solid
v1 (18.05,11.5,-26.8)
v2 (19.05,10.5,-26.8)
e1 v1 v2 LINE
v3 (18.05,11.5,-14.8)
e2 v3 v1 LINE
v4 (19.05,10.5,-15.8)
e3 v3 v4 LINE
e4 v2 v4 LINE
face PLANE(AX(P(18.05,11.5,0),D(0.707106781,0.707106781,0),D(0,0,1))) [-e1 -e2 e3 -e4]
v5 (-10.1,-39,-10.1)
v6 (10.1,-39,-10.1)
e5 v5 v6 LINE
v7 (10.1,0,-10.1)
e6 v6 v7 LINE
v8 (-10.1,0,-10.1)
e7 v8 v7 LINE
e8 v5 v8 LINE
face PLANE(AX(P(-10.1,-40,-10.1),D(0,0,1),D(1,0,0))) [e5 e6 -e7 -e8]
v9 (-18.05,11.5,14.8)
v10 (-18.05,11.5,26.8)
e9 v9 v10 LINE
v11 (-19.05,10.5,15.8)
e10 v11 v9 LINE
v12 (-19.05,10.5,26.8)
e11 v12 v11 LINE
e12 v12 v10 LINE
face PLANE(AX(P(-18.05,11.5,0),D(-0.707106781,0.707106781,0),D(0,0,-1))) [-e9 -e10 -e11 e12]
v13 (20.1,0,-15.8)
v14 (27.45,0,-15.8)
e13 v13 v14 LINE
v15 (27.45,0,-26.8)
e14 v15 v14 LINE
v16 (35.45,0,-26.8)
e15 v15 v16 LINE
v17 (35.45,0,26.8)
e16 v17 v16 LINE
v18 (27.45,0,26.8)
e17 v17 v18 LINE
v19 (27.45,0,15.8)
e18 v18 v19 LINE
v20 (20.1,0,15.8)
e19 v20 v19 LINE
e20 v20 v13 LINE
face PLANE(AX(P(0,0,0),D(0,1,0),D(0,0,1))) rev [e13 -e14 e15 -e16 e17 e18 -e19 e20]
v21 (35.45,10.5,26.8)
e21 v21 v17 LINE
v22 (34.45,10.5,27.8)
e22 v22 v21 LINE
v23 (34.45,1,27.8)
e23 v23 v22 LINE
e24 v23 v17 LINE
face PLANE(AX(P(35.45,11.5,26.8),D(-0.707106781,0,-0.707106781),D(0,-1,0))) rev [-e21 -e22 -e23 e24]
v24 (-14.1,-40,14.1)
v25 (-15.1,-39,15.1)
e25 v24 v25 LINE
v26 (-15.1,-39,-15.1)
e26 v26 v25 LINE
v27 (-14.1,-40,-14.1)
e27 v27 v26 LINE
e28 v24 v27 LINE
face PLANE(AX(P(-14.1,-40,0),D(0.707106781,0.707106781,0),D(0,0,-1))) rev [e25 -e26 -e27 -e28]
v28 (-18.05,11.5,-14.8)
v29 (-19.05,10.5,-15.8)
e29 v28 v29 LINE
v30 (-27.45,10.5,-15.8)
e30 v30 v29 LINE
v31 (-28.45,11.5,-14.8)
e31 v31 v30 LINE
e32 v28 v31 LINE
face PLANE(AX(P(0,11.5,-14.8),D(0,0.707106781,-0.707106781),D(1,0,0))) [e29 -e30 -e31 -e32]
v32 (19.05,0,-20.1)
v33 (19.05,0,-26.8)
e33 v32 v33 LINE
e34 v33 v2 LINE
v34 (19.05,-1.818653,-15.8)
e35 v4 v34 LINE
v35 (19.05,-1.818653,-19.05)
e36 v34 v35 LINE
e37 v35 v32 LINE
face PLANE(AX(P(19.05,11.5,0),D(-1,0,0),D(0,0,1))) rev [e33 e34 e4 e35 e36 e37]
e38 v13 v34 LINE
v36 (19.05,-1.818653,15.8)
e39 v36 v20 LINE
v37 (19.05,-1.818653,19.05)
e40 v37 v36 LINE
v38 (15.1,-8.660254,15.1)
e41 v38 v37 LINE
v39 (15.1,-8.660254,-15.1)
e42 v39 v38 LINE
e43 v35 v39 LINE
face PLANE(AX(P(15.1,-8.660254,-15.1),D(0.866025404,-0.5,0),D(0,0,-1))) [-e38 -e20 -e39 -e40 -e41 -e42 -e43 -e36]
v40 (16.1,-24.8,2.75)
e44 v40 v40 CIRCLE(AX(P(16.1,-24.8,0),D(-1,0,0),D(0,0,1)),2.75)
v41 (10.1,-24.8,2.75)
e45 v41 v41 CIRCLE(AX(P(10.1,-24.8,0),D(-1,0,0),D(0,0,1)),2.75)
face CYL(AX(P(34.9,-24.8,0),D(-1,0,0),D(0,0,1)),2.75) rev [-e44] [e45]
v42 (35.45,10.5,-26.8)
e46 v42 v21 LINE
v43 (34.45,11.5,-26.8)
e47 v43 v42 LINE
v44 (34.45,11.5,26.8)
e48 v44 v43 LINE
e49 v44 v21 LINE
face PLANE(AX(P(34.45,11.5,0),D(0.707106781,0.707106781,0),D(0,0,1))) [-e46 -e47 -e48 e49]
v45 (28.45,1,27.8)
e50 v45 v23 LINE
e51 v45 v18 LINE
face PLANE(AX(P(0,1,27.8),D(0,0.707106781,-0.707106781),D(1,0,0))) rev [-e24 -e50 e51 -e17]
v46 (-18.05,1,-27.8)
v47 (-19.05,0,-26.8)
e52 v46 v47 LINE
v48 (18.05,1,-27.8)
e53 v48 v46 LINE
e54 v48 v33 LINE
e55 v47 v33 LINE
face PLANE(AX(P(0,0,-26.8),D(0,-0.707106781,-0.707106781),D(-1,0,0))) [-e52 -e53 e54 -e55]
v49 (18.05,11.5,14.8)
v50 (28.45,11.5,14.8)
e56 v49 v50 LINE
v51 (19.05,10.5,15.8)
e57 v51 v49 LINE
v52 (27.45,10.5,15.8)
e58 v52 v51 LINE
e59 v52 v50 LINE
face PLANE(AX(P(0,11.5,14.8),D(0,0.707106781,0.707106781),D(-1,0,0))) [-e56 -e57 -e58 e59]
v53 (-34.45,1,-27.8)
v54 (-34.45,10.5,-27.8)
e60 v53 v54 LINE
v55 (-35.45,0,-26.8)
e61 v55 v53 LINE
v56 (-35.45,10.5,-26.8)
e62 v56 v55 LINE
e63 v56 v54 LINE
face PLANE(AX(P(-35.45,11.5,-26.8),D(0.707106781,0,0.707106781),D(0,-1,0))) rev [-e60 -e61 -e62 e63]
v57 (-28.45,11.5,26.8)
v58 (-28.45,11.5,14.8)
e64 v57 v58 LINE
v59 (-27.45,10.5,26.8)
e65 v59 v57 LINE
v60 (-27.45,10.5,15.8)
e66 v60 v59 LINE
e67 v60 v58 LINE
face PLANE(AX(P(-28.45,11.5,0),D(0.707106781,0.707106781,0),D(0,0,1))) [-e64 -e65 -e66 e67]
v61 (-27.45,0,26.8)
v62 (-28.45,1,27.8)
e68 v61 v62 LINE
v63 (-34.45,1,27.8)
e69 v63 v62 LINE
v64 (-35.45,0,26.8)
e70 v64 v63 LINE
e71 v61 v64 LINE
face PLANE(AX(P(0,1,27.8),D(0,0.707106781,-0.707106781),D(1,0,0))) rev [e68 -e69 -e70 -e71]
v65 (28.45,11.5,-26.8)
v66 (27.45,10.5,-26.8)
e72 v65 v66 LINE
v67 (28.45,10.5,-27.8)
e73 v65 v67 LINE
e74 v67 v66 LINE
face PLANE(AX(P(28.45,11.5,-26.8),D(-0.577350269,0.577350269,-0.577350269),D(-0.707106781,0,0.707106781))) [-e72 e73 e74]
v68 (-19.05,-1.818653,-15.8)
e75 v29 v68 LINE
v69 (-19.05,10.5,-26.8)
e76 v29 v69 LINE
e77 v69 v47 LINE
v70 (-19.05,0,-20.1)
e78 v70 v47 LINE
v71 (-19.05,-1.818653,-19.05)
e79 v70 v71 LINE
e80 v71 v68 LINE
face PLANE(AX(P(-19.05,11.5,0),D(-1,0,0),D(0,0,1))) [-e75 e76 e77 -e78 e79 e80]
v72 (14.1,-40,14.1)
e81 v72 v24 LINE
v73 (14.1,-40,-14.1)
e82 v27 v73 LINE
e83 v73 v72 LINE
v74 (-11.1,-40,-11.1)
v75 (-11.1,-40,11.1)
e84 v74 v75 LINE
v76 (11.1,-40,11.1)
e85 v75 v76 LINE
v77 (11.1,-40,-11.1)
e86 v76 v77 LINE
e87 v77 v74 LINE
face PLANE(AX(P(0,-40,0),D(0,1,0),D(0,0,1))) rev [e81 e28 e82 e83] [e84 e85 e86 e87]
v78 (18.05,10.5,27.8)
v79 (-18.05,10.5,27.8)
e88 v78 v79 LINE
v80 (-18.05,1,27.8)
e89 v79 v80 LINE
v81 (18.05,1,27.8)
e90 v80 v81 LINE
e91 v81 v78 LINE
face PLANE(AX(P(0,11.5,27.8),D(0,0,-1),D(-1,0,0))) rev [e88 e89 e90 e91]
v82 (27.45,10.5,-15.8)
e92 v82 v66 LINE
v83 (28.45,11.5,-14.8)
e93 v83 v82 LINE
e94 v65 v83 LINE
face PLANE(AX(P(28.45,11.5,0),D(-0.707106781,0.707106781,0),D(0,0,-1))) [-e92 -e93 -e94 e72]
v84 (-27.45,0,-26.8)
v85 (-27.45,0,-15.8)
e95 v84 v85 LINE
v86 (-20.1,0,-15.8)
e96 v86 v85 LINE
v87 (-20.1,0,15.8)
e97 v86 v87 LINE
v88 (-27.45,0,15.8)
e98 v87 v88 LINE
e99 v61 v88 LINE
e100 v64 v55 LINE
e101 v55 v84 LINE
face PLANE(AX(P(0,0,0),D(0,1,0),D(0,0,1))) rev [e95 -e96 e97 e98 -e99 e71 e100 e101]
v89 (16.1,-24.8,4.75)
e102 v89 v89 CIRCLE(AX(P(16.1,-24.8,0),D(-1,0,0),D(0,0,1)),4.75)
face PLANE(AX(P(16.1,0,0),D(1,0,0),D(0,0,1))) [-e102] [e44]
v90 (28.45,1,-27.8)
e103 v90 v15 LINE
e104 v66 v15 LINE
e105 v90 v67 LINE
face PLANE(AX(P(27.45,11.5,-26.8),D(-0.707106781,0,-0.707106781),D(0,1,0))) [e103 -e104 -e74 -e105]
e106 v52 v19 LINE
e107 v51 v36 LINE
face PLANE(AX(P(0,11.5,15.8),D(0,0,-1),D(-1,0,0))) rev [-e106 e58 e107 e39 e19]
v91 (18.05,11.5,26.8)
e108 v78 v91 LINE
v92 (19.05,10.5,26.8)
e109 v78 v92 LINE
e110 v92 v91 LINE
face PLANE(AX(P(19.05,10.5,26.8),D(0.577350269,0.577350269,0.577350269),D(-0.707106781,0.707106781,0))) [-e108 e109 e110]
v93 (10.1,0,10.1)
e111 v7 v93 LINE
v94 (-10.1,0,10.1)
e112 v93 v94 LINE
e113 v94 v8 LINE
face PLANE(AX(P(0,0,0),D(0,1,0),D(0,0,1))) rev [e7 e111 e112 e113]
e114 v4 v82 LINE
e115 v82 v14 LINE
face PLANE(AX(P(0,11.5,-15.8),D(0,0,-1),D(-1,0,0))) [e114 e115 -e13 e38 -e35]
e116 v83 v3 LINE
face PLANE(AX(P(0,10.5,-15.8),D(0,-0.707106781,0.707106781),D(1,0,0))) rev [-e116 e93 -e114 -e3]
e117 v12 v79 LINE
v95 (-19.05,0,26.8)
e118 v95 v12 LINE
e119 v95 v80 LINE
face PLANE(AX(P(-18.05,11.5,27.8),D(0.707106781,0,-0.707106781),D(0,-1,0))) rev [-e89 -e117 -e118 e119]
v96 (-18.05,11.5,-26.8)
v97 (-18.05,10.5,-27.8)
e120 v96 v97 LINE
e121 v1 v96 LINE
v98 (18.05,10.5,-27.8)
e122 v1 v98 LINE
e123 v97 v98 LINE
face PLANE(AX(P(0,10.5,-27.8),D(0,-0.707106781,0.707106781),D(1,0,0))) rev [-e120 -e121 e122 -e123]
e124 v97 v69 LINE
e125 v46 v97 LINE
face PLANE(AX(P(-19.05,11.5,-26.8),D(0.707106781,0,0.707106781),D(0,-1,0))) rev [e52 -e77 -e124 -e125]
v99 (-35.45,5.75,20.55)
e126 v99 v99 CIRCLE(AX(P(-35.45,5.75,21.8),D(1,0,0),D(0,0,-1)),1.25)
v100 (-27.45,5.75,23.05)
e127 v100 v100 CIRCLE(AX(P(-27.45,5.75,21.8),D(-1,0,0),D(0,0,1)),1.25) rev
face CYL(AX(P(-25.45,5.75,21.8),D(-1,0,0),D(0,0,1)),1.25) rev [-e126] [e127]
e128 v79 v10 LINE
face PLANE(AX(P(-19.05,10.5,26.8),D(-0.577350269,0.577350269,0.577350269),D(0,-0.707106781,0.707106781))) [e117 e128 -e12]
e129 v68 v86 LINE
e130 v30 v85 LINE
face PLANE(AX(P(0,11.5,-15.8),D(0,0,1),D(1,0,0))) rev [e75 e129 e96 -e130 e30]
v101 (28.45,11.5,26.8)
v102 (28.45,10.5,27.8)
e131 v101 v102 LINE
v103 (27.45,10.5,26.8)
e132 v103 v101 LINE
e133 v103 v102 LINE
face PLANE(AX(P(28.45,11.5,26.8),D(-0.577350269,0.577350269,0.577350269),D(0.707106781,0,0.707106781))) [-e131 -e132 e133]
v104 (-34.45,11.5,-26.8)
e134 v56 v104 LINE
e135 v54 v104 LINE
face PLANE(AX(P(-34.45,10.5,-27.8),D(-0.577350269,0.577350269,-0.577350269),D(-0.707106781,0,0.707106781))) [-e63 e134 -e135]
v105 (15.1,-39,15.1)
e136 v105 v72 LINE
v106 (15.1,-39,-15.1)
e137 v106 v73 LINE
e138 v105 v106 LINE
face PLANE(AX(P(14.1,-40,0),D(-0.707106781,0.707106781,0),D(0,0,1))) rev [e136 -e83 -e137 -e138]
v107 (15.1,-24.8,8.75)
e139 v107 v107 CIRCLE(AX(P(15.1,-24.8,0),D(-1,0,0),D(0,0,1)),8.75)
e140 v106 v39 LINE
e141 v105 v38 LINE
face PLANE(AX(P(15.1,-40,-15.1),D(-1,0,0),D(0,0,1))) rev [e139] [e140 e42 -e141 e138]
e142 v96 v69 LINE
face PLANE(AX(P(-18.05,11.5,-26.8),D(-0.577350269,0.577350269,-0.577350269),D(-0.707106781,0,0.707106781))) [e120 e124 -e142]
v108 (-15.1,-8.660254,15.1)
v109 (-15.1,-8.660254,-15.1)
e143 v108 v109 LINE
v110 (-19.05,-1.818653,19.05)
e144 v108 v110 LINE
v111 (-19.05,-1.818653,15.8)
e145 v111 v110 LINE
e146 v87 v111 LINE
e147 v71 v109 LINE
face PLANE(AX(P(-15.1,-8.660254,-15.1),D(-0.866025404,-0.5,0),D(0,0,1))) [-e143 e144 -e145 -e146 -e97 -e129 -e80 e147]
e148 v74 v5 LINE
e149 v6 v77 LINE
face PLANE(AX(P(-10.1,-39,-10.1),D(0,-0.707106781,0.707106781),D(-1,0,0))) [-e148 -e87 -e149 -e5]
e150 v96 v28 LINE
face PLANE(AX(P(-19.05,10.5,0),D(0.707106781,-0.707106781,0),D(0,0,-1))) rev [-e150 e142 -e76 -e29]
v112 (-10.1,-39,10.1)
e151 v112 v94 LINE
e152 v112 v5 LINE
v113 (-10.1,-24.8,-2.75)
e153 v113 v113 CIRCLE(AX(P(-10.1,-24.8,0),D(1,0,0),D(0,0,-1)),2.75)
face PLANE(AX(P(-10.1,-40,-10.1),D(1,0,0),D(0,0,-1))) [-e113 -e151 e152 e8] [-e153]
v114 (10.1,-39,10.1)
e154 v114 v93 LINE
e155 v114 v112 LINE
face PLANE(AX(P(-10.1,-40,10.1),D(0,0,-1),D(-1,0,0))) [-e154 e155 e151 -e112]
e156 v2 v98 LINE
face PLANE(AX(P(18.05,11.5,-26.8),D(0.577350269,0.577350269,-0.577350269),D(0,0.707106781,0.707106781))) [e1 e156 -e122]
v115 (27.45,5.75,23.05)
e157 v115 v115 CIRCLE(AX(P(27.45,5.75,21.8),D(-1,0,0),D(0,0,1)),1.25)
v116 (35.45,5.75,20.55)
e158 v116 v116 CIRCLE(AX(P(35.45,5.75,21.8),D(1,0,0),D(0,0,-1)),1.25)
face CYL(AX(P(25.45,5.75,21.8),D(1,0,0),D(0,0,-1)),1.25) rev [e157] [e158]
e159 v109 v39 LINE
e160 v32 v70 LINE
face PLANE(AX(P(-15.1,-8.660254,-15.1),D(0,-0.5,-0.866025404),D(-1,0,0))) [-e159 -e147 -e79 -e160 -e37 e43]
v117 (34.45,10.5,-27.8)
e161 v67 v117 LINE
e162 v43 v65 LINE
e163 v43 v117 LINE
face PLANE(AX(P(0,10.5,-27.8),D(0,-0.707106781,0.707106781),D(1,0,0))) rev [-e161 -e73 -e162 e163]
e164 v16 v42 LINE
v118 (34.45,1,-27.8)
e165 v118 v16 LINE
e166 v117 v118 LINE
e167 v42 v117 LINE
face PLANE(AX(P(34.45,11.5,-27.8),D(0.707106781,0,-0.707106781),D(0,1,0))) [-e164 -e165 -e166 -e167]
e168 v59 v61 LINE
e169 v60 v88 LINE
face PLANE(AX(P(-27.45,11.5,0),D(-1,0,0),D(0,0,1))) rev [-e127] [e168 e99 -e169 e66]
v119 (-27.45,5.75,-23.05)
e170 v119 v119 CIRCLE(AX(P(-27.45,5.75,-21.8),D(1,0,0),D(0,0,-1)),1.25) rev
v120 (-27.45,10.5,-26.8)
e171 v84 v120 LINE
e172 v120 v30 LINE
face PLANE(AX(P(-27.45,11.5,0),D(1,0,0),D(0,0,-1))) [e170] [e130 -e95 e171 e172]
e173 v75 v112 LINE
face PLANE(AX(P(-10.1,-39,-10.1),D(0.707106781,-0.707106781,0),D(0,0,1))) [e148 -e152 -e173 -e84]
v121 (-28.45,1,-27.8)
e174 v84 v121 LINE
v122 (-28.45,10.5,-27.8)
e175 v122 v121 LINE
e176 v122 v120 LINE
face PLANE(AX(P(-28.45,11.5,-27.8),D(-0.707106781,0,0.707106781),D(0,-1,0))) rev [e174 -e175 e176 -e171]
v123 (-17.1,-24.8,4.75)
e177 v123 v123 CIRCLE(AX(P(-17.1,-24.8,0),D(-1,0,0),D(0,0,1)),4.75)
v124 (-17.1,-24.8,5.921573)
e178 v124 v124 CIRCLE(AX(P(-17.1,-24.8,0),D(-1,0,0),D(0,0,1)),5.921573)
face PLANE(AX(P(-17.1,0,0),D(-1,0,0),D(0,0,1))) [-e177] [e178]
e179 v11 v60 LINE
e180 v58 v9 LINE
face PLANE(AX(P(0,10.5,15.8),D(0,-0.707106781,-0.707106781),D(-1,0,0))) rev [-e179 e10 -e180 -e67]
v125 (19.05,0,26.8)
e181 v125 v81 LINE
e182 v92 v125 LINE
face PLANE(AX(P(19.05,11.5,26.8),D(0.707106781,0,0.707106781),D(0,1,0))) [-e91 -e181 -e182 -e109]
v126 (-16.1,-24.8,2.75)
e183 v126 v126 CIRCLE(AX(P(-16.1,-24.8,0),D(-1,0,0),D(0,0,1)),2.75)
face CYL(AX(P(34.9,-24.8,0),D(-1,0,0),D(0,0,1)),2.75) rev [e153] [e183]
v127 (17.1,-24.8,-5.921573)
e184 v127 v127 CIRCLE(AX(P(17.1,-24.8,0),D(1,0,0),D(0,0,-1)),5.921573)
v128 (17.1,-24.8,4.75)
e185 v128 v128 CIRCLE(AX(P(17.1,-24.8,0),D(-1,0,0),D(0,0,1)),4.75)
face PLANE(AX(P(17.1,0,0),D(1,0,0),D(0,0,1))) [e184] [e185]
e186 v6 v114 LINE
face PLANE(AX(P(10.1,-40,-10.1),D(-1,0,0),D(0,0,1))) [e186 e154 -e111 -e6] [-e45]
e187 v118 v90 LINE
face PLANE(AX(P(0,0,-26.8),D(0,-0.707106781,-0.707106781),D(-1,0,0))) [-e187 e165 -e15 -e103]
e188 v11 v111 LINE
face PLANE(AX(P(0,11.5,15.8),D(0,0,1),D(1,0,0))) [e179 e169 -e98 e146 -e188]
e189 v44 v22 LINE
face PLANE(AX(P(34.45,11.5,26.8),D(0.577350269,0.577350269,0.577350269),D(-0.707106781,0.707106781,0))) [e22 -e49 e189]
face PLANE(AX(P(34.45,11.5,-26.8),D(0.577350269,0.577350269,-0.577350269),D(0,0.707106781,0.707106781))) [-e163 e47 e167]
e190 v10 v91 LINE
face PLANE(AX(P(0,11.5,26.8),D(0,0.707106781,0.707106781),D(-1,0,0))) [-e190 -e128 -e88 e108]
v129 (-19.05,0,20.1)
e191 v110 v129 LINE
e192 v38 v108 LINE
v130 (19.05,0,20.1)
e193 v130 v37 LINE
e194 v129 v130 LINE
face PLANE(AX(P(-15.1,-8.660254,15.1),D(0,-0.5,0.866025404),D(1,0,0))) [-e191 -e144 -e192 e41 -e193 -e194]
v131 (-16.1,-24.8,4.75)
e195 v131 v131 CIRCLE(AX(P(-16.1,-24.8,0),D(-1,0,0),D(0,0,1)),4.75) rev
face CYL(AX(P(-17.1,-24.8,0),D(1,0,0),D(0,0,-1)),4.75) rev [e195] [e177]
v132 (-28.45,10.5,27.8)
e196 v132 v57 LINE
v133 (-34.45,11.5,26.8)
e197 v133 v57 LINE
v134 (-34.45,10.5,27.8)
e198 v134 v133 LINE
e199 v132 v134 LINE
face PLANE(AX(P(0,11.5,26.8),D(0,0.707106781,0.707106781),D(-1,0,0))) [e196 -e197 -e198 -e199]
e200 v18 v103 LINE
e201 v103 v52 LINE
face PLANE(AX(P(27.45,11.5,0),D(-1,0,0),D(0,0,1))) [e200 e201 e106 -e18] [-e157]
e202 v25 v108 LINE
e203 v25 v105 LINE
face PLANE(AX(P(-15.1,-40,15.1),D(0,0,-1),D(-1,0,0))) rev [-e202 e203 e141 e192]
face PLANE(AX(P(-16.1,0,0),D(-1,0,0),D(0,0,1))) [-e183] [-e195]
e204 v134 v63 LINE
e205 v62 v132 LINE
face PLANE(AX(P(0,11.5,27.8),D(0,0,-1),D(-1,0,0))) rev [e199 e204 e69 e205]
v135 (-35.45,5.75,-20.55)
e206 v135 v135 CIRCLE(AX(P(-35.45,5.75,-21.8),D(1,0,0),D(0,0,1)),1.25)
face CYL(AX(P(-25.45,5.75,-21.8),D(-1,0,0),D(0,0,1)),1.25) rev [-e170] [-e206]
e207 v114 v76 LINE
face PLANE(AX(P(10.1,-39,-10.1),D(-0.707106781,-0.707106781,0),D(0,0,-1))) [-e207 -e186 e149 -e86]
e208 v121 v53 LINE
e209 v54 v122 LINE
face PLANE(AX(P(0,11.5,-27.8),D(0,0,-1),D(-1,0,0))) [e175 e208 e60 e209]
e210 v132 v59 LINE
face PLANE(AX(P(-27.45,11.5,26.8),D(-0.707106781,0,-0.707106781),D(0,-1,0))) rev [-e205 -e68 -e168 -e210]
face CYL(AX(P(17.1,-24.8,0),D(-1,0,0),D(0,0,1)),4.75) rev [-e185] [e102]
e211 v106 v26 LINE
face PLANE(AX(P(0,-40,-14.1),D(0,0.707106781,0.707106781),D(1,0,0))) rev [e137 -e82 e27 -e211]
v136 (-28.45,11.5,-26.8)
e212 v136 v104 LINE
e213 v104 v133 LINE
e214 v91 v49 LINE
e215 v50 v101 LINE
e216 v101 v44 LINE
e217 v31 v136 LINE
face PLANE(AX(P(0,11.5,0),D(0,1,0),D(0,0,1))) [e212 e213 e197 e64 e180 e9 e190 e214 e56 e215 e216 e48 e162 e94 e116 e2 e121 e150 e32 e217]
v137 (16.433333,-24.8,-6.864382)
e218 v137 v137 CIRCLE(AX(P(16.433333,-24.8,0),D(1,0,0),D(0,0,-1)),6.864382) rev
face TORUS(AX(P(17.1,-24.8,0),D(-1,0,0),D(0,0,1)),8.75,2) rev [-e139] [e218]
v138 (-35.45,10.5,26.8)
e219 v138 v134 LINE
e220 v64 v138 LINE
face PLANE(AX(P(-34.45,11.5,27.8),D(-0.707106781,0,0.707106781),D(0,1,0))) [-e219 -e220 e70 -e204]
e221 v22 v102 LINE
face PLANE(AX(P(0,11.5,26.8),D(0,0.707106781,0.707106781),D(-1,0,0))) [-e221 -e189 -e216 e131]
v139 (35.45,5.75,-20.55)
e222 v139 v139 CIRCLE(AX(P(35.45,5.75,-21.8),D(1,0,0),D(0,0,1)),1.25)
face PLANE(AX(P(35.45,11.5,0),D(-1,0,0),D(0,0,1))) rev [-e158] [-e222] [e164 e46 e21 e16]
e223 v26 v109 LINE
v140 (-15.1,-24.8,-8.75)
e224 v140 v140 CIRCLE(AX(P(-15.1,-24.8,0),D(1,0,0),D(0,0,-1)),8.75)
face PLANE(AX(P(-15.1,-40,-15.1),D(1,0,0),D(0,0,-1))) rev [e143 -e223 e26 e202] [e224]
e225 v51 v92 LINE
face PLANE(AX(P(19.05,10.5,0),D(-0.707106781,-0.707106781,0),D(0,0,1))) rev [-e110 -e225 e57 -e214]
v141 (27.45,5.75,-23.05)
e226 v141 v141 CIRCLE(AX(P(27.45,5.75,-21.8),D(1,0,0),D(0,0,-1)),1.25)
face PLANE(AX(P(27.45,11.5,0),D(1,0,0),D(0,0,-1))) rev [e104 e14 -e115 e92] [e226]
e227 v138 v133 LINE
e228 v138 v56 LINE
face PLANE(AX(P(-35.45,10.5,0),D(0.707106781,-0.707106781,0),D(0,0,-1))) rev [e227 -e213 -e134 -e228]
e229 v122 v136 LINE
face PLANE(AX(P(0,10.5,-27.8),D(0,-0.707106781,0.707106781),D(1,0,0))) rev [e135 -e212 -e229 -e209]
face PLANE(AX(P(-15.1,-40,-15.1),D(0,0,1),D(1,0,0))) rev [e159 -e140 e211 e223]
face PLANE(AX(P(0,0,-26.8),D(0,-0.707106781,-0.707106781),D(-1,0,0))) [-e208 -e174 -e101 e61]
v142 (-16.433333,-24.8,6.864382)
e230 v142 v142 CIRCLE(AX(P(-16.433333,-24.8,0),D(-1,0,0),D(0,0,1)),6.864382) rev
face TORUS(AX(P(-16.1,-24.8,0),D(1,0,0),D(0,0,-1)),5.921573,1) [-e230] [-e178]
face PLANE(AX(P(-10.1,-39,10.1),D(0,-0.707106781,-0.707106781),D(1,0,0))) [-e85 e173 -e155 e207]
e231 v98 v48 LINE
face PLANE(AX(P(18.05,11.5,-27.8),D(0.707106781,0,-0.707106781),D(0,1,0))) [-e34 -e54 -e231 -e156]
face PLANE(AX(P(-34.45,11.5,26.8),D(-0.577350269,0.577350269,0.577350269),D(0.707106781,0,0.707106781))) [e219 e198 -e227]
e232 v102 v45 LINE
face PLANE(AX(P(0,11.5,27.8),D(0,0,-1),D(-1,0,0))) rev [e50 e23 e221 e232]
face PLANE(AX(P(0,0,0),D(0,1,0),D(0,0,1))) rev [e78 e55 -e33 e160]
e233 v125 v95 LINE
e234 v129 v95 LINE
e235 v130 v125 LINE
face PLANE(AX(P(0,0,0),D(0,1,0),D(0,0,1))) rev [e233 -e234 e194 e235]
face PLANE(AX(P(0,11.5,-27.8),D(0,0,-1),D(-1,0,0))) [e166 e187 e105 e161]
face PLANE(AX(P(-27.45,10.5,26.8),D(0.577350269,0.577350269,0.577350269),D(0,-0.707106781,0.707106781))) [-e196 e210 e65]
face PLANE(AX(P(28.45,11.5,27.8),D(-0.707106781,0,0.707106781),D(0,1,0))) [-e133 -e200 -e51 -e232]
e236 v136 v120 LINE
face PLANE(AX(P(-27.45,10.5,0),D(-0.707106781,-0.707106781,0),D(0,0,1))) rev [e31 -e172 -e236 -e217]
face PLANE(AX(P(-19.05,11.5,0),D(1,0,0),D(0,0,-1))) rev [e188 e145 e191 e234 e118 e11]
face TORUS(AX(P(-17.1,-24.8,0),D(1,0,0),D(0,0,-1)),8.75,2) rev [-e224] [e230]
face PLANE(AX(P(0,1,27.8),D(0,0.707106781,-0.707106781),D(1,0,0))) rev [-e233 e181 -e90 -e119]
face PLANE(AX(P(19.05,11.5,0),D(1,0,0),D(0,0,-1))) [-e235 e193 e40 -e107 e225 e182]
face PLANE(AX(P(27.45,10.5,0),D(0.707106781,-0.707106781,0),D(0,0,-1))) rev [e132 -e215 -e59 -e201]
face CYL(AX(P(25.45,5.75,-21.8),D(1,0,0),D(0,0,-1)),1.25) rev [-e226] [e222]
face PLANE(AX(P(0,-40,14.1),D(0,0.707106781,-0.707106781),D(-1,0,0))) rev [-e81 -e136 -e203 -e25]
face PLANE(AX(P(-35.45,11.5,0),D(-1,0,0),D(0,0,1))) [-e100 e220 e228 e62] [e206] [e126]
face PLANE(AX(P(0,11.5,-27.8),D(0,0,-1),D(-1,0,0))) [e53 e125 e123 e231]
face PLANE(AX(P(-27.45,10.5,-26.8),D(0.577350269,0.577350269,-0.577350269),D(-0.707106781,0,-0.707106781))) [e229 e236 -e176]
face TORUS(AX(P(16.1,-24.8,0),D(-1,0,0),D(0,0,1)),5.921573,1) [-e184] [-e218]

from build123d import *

# Parameters (mm, degrees)
BOSS_EXTRUDE1_DEPTH = 11.5
SKETCH2_W           = 30.2
SKETCH2_H           = 30.2
SKETCH2_W_2         = 20.2
SKETCH2_H_2         = 20.2
BOSS_EXTRUDE2_DEPTH = 40
SKETCH_S_R          = 2.75
CUT_EXTRUDE1_DEPTH  = 50
BOSS_EXTRUDE3_START = 1
SKETCH_S_3_R        = 4.75
SKETCH_S_3_R_2      = 2.75
BOSS_EXTRUDE3_DEPTH = 1
BOSS_EXTRUDE4_START = 2
SKETCH_S_4_R        = 6.75
SKETCH_S_4_R_2      = 4.75
BOSS_EXTRUDE4_DEPTH = 2
FILLET1_R           = 2
FILLET2_R           = 1
CHAMFER1_START      = -15.1
CHAMFER1_DEPTH      = 30.2
CHAMFER1_START_2    = -20.1
CHAMFER1_2_DEPTH    = 40.2
CHAMFER1_START_3    = -15.8
CHAMFER1_3_DEPTH    = 31.6
CHAMFER1_START_4    = -20
CHAMFER1_4_DEPTH    = 40
SKETCH3_R           = 1.25
CUT_EXTRUDE2_DEPTH  = 10
CHAMFER2_SIZE       = 1


with BuildPart() as part:
    # Sketch1 → Boss-Extrude1 (new body)
    with BuildSketch(Plane(origin=(0, 0, 0), x_dir=(1, 0, 0), z_dir=(0, 1, 0))):
        Polygon((27.45, 15.8), (19.05, 15.8), (19.05, 27.8), (-19.05, 27.8), (-19.05, 15.8), (-27.45, 15.8), (-27.45, 27.8), (-35.45, 27.8), (-35.45, -27.8), (-27.45, -27.8), (-27.45, -15.8), (-19.05, -15.8), (-19.05, -27.8), (19.05, -27.8), (19.05, -15.8), (27.45, -15.8), (27.45, -27.8), (35.45, -27.8), (35.45, 27.8), (27.45, 27.8), align=None)
    extrude(amount=BOSS_EXTRUDE1_DEPTH)

    # Sketch2 → Boss-Extrude2 (add)
    with BuildSketch(Plane.XZ):
        Rectangle(SKETCH2_W, SKETCH2_H)
        Rectangle(SKETCH2_W_2, SKETCH2_H_2, mode=Mode.SUBTRACT)
    extrude(amount=BOSS_EXTRUDE2_DEPTH)

    # s → Cut-Extrude1 (cut)
    with BuildSketch(Plane.ZY.offset(15.1)):
        with Locations((0, -24.8)):
            Circle(SKETCH_S_R)
    extrude(amount=-CUT_EXTRUDE1_DEPTH, mode=Mode.SUBTRACT)

    # s<3> → Boss-Extrude3 (add)
    with BuildSketch(Plane.ZY.offset(15.1).offset(BOSS_EXTRUDE3_START)):
        with Locations(Location((0, -24.8, 0), (0, 0, 180))):
            Circle(SKETCH_S_3_R)
        with Locations((0, -24.8)):
            Circle(SKETCH_S_3_R_2, mode=Mode.SUBTRACT)
    boss_extrude3 = extrude(amount=-BOSS_EXTRUDE3_DEPTH)

    # s<4> → Boss-Extrude4 (add)
    with BuildSketch(Plane.ZY.offset(15.1).offset(BOSS_EXTRUDE4_START)):
        with Locations(Location((0, -24.8, 0), (0, 0, 180))):
            Circle(SKETCH_S_4_R)
        with Locations((0, -24.8)):
            Circle(SKETCH_S_4_R_2, mode=Mode.SUBTRACT)
    boss_extrude4 = extrude(amount=-BOSS_EXTRUDE4_DEPTH)

    # Mirror3: Boss-Extrude3, Boss-Extrude4 across plane
    add(boss_extrude3.mirror(Plane(origin=(0, 0, 0), x_dir=(0, 0, 1), z_dir=(1, 0, 0))))
    add(boss_extrude4.mirror(Plane(origin=(0, 0, 0), x_dir=(0, 0, 1), z_dir=(1, 0, 0))))

    # Fillet1
    fillet1_edges = [part.edges().sort_by_distance(p)[0] for p in [
        (15.1, -24.8, 6.75),
        (-15.1, -24.8, 6.75),
    ]]
    fillet(fillet1_edges, radius=FILLET1_R - 0.0001)  # a hair under: the kernel refuses the full size

    # Fillet2
    fillet2_edges = [part.edges().sort_by_distance(p)[0] for p in [
        (17.1, -24.8, 6.75),
        (-17.1, -24.8, 6.75),
    ]]
    fillet(fillet2_edges, radius=FILLET2_R)

    # Chamfer1: read off the stored shape, not the designer's step
    # Chamfer1 outline → Chamfer1 (add)
    with BuildSketch(Plane.YZ.offset(CHAMFER1_START)):
        Polygon((0, 15.8), (0, 20.1), (-8.660254038, 15.1), (0, 15.1), align=None)
        Polygon((0, -15.8), (0, -15.1), (-8.660254038, -15.1), (0, -20.1), align=None)
    extrude(amount=CHAMFER1_DEPTH)

    # Chamfer1 2 outline → Chamfer1 2 (add)
    with BuildSketch(Plane.XY.offset(CHAMFER1_START_2)):
        Polygon((19.05, -1.818653348), (19.05, 0), (15.1, 0), (15.1, -8.660254038), align=None)
        Polygon((-15.1, -8.660254038), (-15.1, 0), (-19.05, 0), (-19.05, -1.818653348), align=None)
    extrude(amount=CHAMFER1_2_DEPTH)

    # Chamfer1 3 outline → Chamfer1 3 (add)
    with BuildSketch(Plane.XY.offset(CHAMFER1_START_3)):
        Polygon((20.1, 0), (19.05, 0), (19.05, -1.818653348), align=None)
        Polygon((-19.05, -1.818653348), (-19.05, 0), (-20.1, 0), align=None)
    extrude(amount=CHAMFER1_3_DEPTH)

    # Chamfer1 4 outline → Chamfer1 4 (cut)
    with BuildSketch(Plane.YZ.offset(CHAMFER1_START_4)):
        Polygon((-8.660254038, 15.1), (0, 20.1), (-8.660254038, 20.1), align=None)
        Polygon((-8.660254038, -20.1), (0, -20.1), (-8.660254038, -15.1), align=None)
    extrude(amount=CHAMFER1_4_DEPTH, mode=Mode.SUBTRACT)

    # Sketch3 → Cut-Extrude2 (cut)
    with BuildSketch(Plane(origin=(35.45, 0, 0), x_dir=(0, 0, -1), z_dir=(1, 0, 0))):
        with Locations((-21.8, 5.75)):
            Circle(SKETCH3_R)
        with Locations((21.8, 5.75)):
            Circle(SKETCH3_R)
    cut_extrude2 = extrude(amount=-CUT_EXTRUDE2_DEPTH, mode=Mode.SUBTRACT)

    # Mirror4: Cut-Extrude2 across plane
    add(cut_extrude2.mirror(Plane(origin=(0, 0, 0), x_dir=(0, 0, 1), z_dir=(1, 0, 0))), mode=Mode.SUBTRACT)

    # Chamfer2
    chamfer2_edges = [part.edges().sort_by_distance(p)[0] for p in [
        (31.45, 11.5, -27.8),
        (27.45, 11.5, -21.8),
        (0, 0, 27.8),
        (23.25, 11.5, -15.8),
        (-31.45, 0, 27.8),
        (-31.45, 0, -27.8),
        (19.05, 11.5, -21.8),
        (0, 0, -27.8),
        (31.45, 0, -27.8),
        (31.45, 0, 27.8),
        (0, 11.5, -27.8),
        (-19.05, 11.5, -21.8),
        (27.45, 5.75, 27.8),
        (19.05, 5.75, 27.8),
        (-19.05, 5.75, 27.8),
        (-27.45, 5.75, 27.8),
        (-35.45, 5.75, 27.8),
        (-35.45, 5.75, -27.8),
        (-27.45, 5.75, -27.8),
        (-23.25, 11.5, -15.8),
        (-19.05, 5.75, -27.8),
        (19.05, 5.75, -27.8),
        (27.45, 5.75, -27.8),
        (35.45, 5.75, -27.8),
        (35.45, 5.75, 27.8),
        (-27.45, 11.5, -21.8),
        (-31.45, 11.5, -27.8),
        (-35.45, 11.5, 0),
        (31.45, 11.5, 27.8),
        (-31.45, 11.5, 27.8),
        (-27.45, 11.5, 21.8),
        (-23.25, 11.5, 15.8),
        (-19.05, 11.5, 21.8),
        (15.1, -40, 0),
        (0, -40, 15.1),
        (-15.1, -40, 0),
        (0, -40, -15.1),
        (0, 11.5, 27.8),
        (10.1, -40, 0),
        (0, -40, 10.1),
        (-10.1, -40, 0),
        (0, -40, -10.1),
        (19.05, 11.5, 21.8),
        (23.25, 11.5, 15.8),
        (27.45, 11.5, 21.8),
        (35.45, 11.5, 0),
    ]]
    chamfer(chamfer2_edges, length=CHAMFER2_SIZE)


solid = part.part
